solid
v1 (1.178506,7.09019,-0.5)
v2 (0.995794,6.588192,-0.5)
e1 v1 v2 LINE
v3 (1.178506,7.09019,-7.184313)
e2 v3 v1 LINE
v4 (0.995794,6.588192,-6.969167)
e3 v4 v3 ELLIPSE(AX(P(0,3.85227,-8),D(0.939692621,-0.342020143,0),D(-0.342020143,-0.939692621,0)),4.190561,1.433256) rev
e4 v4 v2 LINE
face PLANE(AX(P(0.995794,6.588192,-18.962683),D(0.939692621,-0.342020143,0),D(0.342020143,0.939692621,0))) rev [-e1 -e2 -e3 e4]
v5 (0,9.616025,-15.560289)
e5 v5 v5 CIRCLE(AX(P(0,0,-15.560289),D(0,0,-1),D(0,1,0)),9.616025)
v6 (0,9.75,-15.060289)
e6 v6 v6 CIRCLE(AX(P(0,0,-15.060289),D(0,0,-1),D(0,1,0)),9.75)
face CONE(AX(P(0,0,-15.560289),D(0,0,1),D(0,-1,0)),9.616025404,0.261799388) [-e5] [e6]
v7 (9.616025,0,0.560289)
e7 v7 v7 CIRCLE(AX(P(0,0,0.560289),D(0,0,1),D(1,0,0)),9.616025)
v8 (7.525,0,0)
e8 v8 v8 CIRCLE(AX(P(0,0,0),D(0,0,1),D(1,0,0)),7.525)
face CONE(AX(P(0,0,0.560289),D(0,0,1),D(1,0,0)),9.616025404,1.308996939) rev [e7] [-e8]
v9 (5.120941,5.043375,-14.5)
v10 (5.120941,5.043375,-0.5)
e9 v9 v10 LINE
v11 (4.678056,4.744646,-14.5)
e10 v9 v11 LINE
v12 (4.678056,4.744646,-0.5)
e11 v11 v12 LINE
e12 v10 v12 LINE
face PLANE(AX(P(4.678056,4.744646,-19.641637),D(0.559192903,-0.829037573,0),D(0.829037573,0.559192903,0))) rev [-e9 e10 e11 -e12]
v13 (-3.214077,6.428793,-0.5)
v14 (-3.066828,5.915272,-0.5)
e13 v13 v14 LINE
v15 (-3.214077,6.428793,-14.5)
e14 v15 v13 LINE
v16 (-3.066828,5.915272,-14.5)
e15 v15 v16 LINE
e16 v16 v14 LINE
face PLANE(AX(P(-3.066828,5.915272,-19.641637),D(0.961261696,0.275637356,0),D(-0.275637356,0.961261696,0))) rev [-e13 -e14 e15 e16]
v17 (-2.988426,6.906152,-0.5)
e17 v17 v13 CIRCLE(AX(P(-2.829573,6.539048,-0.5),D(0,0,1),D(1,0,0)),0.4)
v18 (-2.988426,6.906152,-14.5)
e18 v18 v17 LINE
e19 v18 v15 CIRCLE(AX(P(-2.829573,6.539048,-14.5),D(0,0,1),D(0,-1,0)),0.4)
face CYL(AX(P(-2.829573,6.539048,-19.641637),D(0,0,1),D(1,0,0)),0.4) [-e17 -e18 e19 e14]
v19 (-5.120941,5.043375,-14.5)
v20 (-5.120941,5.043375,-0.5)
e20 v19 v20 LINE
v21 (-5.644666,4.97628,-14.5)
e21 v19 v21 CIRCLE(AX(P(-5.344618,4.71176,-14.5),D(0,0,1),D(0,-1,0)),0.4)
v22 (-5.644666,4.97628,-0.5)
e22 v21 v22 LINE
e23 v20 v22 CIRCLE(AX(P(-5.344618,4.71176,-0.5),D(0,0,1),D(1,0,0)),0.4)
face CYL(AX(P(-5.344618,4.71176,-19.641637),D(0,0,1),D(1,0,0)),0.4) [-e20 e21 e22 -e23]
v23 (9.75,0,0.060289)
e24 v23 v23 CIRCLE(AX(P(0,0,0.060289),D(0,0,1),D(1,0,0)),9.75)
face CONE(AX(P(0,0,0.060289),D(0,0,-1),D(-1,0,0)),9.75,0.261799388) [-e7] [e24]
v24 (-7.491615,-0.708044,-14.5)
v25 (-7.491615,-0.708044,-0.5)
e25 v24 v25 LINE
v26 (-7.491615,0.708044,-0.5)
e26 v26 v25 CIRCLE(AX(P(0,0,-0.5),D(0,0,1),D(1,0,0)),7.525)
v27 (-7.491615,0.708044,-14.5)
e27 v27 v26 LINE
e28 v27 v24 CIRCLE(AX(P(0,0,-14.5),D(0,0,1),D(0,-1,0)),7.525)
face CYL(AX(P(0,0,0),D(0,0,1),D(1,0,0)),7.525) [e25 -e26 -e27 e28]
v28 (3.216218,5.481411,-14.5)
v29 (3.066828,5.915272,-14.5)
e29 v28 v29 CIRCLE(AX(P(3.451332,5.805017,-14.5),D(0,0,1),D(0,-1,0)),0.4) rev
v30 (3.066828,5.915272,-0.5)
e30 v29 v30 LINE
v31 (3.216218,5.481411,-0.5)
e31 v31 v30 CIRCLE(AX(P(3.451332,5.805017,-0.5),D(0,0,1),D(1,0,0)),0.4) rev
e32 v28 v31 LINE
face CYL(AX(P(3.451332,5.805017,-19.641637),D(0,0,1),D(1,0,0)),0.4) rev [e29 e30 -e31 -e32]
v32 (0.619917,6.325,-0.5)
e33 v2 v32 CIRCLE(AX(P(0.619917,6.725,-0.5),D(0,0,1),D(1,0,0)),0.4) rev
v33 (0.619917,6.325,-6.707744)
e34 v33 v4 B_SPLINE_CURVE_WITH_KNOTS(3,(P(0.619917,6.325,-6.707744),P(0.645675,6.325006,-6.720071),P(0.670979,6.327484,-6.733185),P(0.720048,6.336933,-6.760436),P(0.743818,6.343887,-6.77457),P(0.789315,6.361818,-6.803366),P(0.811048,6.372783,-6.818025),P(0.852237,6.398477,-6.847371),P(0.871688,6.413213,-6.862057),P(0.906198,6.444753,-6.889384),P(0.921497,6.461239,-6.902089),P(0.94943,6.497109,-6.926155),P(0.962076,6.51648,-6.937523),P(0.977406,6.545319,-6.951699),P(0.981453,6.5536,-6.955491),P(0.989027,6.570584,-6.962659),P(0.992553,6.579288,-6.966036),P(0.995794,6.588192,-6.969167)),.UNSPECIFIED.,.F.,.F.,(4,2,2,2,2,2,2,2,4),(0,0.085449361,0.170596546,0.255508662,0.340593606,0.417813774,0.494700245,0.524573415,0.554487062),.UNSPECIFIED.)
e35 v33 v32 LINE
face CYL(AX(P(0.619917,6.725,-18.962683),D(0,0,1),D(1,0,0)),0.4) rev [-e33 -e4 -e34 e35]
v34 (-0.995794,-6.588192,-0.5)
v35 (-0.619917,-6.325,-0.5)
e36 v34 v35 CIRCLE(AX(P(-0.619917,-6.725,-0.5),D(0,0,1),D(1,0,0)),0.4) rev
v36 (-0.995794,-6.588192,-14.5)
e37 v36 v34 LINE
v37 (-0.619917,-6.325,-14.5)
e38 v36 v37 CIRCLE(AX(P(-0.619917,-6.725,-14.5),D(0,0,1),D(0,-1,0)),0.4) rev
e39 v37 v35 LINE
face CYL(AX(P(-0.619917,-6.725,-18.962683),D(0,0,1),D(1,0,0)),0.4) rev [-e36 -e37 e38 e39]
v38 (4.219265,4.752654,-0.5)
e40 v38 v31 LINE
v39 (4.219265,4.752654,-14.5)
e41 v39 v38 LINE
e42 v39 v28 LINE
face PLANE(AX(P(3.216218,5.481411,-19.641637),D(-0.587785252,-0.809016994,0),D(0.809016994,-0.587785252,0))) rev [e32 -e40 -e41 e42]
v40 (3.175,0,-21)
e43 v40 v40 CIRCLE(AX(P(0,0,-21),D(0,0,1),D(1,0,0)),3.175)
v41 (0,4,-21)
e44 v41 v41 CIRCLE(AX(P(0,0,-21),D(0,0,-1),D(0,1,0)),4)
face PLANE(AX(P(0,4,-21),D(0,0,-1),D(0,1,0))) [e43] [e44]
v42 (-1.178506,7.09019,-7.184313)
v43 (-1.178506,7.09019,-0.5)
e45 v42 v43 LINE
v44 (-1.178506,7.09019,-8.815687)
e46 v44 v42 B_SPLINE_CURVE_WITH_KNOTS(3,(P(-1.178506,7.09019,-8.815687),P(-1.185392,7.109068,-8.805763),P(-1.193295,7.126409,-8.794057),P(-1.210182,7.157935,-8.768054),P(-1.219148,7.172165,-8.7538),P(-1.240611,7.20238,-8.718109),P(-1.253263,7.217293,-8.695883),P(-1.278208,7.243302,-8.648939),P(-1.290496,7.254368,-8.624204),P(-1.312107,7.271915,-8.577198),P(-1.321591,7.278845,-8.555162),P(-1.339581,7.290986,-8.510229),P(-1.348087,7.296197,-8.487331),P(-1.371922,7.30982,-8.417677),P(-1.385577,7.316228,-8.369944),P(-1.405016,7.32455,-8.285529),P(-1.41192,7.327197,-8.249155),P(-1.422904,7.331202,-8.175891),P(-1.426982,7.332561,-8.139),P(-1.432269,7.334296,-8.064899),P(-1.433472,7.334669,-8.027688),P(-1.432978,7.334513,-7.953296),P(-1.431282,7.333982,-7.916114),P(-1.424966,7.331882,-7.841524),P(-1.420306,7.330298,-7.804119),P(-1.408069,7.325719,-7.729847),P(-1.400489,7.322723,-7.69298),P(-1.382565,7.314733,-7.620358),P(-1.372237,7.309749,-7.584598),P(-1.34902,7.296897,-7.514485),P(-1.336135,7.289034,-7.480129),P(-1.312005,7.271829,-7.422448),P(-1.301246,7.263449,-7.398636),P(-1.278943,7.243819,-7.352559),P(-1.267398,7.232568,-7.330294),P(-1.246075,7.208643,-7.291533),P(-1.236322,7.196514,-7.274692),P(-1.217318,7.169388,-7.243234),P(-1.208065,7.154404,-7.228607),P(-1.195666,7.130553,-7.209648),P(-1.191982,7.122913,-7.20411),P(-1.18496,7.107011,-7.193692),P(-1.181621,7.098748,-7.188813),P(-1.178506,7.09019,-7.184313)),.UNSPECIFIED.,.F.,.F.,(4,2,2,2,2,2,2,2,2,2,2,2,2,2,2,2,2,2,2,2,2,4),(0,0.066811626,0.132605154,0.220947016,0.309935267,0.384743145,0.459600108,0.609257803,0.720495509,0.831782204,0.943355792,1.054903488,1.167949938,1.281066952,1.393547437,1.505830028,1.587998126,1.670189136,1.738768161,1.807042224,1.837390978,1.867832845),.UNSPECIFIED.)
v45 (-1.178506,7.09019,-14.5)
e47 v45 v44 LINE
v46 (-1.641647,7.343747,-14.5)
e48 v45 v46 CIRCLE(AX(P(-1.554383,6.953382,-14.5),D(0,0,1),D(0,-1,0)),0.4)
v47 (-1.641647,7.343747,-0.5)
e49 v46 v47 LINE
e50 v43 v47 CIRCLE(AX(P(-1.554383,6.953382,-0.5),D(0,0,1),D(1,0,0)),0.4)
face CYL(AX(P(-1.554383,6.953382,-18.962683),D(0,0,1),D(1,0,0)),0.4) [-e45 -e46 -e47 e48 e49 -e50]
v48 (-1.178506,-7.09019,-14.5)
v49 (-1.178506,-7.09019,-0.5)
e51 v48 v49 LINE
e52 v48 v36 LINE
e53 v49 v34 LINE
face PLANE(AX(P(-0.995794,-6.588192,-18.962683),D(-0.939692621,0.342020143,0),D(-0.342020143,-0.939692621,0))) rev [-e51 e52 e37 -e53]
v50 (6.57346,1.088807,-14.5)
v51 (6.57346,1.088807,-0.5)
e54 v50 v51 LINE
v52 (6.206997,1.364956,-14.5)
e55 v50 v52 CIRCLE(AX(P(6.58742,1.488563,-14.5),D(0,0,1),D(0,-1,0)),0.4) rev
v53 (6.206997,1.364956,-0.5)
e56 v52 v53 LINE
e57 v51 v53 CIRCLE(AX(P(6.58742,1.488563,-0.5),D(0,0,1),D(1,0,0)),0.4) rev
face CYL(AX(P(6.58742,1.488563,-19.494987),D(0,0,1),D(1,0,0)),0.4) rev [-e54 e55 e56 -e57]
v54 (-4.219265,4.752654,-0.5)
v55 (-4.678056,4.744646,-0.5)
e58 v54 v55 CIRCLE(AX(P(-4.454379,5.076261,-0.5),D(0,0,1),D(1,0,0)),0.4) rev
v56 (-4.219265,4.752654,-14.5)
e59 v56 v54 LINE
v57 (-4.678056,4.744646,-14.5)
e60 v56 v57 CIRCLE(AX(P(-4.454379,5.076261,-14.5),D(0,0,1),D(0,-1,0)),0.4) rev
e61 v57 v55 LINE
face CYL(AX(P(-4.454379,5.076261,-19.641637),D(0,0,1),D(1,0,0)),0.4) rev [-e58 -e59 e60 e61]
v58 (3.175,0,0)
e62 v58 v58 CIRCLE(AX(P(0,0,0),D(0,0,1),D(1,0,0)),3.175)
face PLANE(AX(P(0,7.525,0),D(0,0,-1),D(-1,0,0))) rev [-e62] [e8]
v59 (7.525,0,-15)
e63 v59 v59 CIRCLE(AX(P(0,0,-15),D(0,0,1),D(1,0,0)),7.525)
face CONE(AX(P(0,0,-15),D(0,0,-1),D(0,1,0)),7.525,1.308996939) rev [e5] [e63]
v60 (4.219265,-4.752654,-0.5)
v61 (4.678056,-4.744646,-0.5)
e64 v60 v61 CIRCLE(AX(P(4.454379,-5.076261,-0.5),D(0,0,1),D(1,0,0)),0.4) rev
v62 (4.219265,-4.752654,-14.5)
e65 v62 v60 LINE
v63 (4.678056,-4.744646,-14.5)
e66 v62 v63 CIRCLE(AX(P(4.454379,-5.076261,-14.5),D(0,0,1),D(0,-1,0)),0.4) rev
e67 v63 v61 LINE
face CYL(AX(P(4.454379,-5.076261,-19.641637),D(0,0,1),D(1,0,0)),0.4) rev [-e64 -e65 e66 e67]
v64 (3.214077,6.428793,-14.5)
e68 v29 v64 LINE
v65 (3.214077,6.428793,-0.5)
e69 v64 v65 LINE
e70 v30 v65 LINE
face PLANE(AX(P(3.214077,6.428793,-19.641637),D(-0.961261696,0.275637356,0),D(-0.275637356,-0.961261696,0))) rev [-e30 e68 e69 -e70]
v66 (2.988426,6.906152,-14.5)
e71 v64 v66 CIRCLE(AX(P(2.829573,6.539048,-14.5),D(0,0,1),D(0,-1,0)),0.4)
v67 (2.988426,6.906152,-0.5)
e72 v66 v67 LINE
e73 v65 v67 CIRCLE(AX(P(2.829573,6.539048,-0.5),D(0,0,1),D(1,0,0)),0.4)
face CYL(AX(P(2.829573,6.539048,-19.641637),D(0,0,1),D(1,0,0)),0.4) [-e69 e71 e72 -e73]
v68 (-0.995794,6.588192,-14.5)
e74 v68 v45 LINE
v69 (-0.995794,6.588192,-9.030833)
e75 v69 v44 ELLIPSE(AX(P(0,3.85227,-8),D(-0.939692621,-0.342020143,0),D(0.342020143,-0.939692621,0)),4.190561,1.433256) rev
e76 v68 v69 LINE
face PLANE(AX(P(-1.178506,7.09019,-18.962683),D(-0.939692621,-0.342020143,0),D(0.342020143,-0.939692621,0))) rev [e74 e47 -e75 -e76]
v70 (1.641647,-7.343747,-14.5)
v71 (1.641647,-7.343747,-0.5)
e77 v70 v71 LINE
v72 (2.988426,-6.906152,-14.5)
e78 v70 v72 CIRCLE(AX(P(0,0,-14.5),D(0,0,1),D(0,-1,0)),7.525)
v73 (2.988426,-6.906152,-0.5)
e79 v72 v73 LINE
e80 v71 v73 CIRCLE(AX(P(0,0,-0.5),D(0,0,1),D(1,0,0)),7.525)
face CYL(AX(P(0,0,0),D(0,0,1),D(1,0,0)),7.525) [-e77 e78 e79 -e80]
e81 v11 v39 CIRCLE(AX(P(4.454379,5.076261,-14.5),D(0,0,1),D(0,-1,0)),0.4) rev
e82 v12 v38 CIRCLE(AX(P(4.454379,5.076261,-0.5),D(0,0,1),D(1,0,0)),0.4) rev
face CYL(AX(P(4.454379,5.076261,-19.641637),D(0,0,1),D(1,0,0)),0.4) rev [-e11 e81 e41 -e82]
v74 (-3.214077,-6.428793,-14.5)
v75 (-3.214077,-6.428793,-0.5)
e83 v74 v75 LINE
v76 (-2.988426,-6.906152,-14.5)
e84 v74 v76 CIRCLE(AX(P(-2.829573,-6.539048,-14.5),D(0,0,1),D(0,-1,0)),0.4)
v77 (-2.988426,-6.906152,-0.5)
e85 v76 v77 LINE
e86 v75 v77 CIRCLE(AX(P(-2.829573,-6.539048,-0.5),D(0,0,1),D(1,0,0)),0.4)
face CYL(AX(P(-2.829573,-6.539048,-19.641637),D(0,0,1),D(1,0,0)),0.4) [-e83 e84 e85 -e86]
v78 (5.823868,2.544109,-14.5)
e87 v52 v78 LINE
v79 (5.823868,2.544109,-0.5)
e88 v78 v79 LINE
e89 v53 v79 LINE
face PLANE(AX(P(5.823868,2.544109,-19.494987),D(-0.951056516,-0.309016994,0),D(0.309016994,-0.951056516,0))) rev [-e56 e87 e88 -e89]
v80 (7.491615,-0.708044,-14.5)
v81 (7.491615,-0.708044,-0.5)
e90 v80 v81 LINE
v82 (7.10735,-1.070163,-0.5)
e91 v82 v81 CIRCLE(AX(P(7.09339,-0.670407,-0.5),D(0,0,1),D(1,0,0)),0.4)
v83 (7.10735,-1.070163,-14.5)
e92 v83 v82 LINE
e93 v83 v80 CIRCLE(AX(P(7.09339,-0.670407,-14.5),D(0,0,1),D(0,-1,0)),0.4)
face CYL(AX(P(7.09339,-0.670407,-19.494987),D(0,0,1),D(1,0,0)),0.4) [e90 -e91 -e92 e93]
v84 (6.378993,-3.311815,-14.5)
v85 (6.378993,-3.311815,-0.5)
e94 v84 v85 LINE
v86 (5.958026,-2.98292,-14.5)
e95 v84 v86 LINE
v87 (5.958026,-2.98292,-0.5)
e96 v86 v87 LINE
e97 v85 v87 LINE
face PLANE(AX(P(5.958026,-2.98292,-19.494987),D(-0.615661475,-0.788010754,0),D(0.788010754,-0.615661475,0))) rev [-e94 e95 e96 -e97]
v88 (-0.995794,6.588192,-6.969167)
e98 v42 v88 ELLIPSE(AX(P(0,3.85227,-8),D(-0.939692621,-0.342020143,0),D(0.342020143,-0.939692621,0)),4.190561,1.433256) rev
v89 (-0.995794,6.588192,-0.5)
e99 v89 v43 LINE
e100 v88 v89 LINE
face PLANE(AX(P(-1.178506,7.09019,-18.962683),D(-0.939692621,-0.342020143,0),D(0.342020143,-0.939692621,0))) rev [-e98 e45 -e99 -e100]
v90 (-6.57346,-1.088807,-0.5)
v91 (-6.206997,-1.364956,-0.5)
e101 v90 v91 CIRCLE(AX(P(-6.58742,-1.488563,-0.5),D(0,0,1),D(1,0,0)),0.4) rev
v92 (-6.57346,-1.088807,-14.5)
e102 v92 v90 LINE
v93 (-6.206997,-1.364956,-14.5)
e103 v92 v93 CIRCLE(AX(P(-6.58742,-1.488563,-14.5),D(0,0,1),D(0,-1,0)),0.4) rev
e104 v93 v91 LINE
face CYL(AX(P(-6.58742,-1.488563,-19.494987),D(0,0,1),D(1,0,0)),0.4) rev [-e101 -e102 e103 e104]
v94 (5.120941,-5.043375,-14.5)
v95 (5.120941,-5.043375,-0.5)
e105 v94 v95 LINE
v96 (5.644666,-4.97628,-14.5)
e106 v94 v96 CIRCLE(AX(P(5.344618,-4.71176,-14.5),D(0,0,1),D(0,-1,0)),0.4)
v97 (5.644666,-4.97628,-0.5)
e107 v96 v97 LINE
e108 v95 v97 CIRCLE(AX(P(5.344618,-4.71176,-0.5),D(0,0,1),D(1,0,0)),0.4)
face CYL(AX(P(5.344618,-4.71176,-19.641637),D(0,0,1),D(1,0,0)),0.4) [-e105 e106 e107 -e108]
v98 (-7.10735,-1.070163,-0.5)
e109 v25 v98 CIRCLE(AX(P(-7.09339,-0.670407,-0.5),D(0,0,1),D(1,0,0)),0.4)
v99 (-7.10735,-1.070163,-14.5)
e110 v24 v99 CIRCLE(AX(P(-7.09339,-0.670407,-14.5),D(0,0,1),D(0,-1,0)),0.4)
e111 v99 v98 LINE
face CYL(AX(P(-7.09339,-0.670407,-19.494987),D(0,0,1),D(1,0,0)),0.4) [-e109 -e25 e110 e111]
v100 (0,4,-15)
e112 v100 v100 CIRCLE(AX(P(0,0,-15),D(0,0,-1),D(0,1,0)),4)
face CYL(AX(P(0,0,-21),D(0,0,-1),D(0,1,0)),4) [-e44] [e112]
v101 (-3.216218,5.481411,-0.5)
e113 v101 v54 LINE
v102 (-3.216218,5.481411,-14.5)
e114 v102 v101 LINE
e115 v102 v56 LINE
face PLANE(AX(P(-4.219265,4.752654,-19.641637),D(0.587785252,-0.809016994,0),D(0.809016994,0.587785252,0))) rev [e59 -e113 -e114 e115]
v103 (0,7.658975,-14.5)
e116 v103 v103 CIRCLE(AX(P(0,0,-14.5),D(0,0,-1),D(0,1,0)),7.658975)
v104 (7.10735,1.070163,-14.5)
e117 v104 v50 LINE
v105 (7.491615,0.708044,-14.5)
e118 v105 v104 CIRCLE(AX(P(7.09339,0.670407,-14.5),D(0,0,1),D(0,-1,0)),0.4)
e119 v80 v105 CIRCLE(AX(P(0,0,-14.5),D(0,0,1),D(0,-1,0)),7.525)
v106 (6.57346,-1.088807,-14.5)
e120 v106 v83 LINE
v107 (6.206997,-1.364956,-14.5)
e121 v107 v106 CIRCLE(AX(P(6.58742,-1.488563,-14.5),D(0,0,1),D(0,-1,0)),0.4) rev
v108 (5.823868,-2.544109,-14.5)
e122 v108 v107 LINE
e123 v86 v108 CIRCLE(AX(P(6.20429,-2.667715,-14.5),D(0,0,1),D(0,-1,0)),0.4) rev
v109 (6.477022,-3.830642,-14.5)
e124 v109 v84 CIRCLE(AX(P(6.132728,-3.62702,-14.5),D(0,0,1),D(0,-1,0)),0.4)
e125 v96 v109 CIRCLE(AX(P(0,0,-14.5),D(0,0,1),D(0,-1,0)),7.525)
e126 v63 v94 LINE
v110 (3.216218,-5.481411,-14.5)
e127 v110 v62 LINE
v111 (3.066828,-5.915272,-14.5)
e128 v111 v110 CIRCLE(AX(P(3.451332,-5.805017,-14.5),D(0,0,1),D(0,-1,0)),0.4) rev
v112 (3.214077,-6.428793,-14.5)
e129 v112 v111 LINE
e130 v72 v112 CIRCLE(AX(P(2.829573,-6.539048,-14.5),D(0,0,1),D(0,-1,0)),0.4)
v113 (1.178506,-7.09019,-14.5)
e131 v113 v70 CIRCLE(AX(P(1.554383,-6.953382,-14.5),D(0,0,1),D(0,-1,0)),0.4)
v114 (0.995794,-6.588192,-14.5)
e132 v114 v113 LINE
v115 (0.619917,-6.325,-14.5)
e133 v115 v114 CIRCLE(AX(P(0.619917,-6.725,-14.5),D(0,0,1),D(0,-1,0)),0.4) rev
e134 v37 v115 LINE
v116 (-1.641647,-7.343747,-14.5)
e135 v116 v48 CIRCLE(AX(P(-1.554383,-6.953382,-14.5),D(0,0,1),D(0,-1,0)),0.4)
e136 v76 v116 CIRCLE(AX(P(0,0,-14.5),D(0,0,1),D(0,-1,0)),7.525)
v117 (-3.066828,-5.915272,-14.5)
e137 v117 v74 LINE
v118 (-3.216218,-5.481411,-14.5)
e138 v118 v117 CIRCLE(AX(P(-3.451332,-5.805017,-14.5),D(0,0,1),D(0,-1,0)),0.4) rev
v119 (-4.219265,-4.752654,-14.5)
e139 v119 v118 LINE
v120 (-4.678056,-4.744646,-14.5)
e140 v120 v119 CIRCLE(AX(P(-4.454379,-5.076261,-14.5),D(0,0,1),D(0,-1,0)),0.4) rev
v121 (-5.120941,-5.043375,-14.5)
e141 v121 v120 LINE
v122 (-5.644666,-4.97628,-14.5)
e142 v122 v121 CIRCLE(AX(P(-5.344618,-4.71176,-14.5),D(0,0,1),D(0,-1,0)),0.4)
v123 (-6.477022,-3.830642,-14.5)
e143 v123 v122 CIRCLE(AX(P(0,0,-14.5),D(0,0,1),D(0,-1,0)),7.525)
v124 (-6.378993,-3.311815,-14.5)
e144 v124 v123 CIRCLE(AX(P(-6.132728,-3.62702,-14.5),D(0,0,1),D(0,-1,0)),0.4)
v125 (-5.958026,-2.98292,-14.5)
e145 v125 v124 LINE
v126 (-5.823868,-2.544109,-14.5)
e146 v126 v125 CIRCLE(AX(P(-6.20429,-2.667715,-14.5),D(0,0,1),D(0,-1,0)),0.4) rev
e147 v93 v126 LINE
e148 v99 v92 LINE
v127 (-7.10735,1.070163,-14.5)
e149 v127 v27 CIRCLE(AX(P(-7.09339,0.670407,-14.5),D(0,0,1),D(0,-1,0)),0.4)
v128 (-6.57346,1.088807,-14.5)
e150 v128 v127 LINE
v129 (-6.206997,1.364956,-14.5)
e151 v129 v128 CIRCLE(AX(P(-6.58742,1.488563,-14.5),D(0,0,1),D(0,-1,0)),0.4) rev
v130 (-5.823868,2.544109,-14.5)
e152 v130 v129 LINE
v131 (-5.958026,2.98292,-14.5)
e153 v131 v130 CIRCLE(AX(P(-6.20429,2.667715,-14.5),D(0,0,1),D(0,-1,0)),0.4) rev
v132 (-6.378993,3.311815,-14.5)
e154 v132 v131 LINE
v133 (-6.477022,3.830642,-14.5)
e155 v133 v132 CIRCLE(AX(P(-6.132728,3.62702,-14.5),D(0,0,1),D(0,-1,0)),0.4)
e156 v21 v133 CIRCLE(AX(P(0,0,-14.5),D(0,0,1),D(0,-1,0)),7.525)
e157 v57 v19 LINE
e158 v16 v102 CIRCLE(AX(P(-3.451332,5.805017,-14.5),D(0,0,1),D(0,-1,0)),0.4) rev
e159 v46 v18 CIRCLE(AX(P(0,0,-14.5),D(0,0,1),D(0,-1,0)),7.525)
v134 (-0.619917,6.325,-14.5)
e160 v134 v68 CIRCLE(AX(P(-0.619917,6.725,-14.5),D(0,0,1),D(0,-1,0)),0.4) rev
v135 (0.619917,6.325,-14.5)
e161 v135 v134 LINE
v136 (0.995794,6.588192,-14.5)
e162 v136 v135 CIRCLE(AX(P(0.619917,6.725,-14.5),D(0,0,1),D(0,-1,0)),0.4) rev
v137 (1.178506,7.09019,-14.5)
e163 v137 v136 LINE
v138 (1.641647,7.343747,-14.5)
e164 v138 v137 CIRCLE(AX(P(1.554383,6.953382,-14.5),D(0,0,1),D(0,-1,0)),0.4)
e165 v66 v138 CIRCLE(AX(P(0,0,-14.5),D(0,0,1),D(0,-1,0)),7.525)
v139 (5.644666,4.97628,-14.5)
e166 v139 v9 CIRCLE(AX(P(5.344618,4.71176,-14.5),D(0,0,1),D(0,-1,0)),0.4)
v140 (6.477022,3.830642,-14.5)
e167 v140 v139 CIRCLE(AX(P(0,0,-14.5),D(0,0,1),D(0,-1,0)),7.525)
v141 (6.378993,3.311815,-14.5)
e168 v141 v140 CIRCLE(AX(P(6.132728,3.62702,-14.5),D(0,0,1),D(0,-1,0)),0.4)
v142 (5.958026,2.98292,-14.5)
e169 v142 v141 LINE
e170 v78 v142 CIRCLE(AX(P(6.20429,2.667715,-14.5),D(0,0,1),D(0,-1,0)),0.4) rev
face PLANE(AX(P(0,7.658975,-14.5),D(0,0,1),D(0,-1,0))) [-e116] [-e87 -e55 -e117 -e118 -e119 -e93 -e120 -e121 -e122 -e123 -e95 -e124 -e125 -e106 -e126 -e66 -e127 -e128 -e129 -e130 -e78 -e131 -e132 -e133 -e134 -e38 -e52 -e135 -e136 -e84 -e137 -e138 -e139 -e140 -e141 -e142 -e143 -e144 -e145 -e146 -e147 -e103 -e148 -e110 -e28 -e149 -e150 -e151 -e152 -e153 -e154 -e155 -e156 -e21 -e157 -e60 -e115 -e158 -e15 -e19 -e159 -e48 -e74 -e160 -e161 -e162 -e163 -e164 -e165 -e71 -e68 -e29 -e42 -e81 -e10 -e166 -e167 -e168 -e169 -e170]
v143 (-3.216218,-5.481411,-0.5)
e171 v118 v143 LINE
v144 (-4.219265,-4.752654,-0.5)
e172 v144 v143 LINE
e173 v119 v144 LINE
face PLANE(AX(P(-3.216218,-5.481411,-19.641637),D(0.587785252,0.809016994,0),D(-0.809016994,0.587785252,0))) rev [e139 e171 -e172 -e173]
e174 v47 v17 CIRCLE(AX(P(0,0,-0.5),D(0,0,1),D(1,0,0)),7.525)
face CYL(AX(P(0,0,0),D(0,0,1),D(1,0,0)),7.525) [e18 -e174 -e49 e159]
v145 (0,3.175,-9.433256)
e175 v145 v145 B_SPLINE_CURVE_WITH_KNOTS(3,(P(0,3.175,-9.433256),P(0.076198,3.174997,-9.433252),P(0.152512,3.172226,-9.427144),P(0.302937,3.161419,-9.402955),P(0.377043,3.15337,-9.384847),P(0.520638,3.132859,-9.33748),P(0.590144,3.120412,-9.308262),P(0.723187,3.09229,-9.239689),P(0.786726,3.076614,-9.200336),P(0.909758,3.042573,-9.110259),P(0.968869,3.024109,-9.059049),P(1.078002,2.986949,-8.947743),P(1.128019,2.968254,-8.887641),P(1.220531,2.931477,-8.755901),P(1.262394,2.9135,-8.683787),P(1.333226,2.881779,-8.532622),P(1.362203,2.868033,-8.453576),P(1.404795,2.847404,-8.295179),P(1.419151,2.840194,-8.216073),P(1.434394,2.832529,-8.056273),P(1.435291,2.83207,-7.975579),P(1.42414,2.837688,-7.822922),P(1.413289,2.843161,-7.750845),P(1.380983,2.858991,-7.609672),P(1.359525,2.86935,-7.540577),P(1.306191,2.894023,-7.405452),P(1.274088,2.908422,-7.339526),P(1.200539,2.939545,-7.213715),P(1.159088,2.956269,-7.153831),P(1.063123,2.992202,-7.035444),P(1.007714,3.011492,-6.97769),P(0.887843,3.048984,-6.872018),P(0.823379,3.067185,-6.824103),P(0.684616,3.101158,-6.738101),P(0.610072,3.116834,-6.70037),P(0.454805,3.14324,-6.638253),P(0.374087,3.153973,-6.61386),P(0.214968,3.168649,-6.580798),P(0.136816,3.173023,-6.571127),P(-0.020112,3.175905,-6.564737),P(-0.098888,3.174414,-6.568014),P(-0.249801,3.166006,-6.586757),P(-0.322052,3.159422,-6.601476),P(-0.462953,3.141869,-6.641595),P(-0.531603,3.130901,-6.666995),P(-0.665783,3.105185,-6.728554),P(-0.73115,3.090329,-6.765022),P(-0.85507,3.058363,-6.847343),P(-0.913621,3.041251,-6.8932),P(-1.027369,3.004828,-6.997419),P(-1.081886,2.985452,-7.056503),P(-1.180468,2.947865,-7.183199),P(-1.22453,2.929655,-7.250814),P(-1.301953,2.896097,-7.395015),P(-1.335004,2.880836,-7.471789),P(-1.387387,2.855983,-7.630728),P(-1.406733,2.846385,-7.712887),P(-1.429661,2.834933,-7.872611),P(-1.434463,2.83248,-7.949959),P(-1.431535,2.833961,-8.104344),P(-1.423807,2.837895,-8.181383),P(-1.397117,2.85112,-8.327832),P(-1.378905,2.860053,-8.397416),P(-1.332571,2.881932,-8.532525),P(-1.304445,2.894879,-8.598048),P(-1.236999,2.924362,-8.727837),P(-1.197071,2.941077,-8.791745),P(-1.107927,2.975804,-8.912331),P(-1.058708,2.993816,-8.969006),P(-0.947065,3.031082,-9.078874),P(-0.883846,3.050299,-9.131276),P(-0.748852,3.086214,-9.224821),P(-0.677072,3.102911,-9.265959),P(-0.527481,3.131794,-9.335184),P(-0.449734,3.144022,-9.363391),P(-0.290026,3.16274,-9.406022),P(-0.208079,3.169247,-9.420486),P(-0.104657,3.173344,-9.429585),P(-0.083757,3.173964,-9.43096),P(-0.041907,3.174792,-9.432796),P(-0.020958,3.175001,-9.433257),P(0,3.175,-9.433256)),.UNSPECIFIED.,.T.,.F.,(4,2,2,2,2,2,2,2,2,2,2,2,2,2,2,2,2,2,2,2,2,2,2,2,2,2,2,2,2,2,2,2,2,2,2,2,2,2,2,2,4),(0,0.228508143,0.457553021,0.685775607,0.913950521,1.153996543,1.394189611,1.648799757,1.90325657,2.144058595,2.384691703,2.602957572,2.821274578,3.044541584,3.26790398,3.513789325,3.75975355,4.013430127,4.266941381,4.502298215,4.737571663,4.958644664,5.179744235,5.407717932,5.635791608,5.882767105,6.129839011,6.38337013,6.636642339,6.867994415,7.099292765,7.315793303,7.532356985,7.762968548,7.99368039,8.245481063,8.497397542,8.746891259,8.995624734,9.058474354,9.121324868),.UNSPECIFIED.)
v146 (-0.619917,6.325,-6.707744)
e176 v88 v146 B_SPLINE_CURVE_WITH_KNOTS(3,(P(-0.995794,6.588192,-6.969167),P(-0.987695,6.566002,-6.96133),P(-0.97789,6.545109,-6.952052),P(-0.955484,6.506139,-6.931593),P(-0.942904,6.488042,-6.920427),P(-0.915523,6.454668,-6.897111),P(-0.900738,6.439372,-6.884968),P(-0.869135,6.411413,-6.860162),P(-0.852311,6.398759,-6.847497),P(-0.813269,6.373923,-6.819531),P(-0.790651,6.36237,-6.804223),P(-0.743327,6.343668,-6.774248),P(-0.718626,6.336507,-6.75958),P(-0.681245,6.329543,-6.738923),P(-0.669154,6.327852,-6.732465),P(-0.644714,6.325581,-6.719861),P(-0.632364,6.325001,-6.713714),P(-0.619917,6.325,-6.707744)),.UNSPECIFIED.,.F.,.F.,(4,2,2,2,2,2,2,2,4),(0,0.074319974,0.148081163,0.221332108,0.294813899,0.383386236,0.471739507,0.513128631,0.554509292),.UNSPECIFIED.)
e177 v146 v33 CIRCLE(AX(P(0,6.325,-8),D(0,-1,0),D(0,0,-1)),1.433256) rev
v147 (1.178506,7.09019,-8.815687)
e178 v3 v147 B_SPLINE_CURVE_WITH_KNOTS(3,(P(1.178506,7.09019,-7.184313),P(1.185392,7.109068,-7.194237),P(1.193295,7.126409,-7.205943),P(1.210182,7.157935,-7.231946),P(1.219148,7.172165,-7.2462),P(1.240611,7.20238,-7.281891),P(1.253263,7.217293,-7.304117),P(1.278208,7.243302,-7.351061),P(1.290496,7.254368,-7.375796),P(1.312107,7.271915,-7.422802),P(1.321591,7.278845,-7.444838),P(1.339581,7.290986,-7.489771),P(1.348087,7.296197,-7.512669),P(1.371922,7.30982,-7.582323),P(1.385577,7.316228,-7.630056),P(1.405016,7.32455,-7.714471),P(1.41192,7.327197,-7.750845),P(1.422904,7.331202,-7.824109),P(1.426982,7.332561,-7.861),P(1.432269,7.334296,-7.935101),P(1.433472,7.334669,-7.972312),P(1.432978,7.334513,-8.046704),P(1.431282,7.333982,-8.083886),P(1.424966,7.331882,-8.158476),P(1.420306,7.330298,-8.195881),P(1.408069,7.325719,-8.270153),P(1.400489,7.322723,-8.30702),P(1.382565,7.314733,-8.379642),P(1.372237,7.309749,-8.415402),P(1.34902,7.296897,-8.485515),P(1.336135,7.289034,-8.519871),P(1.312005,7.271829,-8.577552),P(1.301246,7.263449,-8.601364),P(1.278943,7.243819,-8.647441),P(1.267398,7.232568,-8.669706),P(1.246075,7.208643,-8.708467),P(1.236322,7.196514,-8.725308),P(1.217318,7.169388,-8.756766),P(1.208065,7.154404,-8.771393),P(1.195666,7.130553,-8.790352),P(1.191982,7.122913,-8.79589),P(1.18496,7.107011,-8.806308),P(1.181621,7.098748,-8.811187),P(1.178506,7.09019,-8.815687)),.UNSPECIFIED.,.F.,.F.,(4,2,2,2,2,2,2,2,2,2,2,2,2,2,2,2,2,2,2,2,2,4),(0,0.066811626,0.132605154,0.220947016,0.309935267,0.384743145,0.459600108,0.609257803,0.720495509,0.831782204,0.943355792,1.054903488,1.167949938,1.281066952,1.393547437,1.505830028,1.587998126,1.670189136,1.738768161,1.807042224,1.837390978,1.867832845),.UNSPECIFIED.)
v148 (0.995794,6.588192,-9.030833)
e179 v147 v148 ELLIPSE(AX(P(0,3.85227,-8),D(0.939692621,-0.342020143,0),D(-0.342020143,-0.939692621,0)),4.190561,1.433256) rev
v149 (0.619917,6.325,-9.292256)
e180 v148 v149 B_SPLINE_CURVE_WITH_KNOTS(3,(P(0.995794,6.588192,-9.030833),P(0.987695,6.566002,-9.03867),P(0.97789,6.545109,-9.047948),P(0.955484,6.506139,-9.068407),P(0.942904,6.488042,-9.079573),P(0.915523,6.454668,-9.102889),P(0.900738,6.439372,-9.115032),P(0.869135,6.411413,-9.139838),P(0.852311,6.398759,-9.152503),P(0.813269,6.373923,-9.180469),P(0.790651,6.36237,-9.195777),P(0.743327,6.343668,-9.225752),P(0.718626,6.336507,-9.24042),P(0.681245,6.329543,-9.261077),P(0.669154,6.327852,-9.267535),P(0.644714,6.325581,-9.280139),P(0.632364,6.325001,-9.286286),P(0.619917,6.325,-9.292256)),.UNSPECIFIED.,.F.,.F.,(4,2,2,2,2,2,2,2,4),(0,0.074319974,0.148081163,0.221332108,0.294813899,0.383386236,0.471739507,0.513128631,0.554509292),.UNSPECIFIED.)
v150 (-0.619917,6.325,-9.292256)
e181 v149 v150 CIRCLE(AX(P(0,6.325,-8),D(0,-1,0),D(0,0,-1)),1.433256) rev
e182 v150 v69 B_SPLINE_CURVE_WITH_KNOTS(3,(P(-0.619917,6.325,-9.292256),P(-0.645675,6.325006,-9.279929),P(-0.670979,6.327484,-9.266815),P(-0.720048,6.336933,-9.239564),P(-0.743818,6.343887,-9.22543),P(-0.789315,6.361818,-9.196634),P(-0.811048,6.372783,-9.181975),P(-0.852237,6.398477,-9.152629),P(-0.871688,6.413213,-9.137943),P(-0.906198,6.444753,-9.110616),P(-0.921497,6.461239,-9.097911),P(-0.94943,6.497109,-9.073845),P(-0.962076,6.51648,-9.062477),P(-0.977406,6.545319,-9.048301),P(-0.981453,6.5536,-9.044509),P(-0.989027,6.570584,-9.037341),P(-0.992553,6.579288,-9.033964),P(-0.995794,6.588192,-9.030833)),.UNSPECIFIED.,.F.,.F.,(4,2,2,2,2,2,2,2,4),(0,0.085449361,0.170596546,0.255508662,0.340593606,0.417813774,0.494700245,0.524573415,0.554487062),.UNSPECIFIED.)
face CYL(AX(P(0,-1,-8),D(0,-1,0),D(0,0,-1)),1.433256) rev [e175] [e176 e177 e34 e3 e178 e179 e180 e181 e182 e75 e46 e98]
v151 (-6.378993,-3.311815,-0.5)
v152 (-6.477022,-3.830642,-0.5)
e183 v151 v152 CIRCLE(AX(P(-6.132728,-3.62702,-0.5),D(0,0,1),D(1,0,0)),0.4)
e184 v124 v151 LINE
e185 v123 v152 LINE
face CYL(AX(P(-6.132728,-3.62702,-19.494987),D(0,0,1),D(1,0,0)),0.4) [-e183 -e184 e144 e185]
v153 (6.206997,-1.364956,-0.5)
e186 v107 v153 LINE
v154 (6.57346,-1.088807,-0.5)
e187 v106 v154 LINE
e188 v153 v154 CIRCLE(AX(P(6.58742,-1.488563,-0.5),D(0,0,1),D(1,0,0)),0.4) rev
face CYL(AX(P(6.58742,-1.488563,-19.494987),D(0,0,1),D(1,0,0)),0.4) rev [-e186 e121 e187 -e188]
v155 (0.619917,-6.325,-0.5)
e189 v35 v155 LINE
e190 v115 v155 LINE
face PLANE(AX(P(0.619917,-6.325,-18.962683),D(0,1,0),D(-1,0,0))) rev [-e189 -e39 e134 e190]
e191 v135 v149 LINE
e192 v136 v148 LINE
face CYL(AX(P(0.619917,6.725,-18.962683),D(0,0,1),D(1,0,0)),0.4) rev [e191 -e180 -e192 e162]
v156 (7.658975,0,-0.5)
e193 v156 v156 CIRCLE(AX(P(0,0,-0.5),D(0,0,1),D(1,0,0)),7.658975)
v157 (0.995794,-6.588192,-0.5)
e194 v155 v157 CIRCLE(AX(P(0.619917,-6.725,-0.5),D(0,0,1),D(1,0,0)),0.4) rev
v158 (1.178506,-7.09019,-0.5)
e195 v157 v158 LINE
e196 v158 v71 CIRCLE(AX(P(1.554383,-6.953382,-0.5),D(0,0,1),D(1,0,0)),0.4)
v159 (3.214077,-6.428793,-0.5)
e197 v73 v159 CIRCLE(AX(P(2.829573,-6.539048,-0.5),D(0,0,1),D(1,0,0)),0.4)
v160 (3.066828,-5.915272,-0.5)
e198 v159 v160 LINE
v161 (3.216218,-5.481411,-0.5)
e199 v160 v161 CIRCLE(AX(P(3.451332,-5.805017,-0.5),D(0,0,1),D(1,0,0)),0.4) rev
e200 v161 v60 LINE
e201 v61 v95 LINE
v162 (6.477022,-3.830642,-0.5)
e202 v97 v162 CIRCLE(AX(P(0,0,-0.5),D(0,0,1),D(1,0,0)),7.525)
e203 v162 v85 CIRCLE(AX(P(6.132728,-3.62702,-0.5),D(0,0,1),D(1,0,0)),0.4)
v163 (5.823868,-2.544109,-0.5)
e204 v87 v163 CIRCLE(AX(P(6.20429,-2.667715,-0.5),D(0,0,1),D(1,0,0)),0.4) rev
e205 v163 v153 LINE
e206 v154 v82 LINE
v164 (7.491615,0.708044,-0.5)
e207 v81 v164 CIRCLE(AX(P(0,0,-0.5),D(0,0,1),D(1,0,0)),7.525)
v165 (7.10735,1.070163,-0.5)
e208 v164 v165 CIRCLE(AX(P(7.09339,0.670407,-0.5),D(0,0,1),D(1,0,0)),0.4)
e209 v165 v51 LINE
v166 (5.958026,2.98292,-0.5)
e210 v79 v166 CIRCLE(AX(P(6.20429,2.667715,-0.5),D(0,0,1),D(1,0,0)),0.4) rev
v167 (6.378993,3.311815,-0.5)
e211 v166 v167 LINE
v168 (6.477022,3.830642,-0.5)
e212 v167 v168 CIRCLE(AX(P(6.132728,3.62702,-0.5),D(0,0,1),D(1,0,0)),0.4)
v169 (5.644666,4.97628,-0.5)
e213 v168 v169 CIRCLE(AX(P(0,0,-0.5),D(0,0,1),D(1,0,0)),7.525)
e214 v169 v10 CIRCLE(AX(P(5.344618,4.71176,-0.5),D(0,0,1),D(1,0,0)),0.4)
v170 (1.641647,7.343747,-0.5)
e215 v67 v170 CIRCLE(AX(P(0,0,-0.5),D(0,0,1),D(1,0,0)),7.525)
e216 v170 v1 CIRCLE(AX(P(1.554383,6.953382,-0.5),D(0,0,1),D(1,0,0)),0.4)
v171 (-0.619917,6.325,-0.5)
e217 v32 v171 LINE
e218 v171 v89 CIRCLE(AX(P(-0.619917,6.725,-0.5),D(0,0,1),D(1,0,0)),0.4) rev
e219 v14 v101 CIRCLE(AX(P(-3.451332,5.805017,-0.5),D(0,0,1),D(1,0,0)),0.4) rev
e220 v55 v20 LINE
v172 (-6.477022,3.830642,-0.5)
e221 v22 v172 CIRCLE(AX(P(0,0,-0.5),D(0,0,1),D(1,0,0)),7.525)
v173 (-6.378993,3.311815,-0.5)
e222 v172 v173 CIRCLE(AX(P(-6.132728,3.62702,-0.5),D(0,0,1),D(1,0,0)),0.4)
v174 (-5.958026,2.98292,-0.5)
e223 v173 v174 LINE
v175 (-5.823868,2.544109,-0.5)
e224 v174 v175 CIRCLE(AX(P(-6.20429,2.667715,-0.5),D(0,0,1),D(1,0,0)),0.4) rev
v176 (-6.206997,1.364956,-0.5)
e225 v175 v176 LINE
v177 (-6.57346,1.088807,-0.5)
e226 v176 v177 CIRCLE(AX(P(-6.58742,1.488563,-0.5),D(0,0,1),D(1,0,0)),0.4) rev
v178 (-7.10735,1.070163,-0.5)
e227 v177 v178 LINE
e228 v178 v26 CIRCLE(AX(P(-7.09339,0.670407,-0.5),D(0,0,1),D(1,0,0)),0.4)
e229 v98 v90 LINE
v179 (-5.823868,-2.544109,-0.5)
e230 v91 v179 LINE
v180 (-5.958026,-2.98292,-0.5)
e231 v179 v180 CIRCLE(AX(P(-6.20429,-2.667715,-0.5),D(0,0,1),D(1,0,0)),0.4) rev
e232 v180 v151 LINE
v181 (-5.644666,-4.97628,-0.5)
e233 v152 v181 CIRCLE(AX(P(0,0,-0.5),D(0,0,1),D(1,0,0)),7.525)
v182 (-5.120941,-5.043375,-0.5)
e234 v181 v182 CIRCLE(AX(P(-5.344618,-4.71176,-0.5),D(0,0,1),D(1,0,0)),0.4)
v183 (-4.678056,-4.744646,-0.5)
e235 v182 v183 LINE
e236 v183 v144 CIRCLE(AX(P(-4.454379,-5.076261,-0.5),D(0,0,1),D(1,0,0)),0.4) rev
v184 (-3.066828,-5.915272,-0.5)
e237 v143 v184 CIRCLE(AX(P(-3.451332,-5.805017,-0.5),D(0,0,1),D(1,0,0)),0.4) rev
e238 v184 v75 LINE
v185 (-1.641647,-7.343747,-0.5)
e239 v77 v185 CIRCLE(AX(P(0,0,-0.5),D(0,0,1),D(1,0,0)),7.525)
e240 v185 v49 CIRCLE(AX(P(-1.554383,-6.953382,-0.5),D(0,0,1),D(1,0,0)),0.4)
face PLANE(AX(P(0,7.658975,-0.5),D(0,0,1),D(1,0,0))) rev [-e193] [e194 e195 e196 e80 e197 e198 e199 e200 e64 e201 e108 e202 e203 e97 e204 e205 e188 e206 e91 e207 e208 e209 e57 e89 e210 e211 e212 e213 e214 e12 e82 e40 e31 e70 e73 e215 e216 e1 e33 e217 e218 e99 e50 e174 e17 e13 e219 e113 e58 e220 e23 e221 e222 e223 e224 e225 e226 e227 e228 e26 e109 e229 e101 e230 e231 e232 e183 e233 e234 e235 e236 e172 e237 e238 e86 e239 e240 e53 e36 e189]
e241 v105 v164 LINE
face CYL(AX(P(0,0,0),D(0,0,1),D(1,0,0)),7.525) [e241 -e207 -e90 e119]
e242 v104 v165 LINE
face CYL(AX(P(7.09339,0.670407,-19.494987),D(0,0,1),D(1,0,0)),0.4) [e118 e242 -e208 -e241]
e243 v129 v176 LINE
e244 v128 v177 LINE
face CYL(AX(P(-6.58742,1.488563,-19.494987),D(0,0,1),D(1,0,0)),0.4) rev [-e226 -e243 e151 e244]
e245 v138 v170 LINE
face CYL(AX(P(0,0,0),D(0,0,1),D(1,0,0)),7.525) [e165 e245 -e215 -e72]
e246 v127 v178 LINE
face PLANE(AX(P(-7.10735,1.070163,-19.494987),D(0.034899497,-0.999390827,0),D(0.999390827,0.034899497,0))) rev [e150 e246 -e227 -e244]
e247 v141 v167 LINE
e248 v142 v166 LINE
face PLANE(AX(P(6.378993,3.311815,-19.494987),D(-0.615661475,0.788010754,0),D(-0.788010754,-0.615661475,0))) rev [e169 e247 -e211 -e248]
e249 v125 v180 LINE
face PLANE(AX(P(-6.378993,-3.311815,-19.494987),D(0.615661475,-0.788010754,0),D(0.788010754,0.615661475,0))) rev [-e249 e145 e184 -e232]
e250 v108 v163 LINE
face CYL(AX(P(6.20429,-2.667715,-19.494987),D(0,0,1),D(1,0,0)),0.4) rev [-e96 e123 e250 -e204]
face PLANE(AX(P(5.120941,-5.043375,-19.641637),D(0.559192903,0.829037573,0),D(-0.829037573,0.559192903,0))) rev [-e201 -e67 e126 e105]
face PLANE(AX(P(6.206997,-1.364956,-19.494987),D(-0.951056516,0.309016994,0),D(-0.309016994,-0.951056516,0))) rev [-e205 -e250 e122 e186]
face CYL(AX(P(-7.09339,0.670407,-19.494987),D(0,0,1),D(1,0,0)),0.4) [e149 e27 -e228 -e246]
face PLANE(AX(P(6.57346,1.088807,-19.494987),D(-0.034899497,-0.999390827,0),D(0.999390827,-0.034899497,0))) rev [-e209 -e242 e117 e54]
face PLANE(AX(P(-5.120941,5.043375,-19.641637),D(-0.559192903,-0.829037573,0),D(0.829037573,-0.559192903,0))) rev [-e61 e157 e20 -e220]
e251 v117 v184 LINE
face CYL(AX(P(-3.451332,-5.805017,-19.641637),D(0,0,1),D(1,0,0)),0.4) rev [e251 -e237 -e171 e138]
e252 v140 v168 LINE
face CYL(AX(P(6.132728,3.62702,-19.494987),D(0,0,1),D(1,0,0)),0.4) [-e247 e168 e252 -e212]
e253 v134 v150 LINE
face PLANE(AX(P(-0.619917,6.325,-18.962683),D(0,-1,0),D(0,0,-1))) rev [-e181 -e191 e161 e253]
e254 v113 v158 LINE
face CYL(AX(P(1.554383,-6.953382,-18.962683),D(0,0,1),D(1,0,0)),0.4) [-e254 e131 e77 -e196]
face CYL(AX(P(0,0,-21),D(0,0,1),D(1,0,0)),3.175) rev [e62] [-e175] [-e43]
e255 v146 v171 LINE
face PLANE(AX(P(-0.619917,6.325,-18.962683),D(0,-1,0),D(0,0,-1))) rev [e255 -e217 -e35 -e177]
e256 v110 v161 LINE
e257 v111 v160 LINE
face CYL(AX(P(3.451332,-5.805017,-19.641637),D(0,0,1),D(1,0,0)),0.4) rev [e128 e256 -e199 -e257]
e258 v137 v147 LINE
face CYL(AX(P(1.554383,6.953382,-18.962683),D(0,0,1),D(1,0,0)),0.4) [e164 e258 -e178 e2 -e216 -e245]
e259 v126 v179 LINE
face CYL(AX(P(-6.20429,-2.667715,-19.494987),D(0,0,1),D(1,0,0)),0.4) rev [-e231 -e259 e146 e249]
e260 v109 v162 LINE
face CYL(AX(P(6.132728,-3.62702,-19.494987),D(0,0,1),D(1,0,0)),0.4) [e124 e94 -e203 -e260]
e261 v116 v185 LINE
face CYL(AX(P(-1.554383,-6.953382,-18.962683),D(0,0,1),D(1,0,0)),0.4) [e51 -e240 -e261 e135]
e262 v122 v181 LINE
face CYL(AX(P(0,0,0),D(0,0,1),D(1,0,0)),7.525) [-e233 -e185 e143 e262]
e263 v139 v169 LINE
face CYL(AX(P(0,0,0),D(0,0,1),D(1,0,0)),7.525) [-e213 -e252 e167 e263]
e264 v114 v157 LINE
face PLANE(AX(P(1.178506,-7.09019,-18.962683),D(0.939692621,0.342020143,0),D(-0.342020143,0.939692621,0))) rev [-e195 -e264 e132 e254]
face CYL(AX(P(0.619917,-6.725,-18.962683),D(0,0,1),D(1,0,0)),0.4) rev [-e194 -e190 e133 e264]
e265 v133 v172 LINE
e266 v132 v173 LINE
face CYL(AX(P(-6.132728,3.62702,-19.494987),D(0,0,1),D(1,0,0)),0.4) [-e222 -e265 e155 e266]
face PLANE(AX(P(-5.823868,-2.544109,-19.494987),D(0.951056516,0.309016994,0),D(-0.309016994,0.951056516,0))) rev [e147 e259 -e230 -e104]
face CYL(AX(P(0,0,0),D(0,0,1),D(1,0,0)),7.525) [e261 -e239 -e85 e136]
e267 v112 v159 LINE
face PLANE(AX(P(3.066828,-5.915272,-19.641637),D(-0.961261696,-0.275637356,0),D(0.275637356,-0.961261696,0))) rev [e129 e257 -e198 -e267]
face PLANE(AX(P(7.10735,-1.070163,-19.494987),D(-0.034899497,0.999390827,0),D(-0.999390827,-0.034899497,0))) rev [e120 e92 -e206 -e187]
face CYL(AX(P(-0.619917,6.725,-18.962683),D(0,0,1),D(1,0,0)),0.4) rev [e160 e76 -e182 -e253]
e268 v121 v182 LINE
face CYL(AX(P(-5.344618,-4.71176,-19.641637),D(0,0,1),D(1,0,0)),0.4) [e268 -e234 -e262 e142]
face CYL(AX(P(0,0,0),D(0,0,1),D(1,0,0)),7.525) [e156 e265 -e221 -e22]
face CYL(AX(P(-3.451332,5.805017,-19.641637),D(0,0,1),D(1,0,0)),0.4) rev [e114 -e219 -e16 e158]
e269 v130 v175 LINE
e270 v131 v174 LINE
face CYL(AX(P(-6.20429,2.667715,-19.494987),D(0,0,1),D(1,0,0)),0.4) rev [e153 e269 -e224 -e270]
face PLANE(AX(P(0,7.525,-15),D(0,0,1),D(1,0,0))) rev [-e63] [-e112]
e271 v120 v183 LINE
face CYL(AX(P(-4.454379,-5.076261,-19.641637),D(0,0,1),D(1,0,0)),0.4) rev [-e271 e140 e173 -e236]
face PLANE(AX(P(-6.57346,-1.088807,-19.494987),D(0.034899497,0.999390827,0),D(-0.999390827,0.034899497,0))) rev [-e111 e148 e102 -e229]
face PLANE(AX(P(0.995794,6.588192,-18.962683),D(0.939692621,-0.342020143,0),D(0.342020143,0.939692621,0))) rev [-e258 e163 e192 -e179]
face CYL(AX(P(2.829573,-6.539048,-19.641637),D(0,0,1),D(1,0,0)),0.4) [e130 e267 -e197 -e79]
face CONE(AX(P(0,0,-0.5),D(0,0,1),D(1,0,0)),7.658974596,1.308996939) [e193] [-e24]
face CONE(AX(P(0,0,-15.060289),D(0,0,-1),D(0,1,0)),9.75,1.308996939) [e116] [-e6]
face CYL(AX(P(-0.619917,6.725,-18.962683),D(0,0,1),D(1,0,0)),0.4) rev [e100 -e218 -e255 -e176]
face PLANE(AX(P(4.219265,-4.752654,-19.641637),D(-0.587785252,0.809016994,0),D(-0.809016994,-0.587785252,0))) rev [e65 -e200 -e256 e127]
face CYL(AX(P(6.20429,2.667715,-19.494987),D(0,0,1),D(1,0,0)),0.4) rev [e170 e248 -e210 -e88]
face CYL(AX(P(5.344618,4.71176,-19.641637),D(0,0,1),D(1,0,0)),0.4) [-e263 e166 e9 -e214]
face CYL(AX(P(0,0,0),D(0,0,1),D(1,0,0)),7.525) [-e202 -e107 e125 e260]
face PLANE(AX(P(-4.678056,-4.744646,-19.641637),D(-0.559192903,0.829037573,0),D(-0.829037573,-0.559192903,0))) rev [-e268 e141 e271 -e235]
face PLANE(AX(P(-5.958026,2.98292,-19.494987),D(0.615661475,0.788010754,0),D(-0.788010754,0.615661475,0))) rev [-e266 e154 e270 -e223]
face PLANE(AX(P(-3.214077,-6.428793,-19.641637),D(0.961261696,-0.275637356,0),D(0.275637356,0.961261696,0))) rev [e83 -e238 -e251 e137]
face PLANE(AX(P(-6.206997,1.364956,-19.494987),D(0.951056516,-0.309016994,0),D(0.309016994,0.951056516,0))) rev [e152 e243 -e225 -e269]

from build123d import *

# Parameters (mm, degrees)
SKETCH5_W                   = 15
SKETCH5_H                   = 7.525
CUT_EXTRUDE_START           = -15
CUT_EXTRUDE_1_OUTLINE_R     = 3.175
CUT_EXTRUDE_1_DEPTH         = 15
CUT_EXTRUDE_START_2         = -21
CUT_EXTRUDE_1_2_OUTLINE_R   = 4
CUT_EXTRUDE_1_2_OUTLINE_R_2 = 3.175
CUT_EXTRUDE_1_2_DEPTH       = 6
CUT_EXTRUDE_START_3         = -14.5
CUT_EXTRUDE_1_3_DEPTH       = 14
CUT_EXTRUDE_START_4         = 2
CUT_EXTRUDE_1_5_OUTLINE_R   = 1.433256124
CUT_EXTRUDE_1_5_DEPTH       = 5.353381724


with BuildPart() as part:
    # Sketch5 → body (revolve)
    with BuildSketch(Plane(origin=(0, 0, 0), x_dir=(0, 0, -1), z_dir=(1, 0, 0)), mode=Mode.PRIVATE) as body_sk:
        with Locations((7.5, 3.7625)):
            Rectangle(SKETCH5_W, SKETCH5_H)
    revolve(body_sk.sketch.rotate(Axis((0, 0, 0), (0, 0, 1)), 270), axis=Axis((0, 0, 0), (0, 0, 1)))

    # Вырез-Вытянуть1: read off the stored shape, not the designer's step
    # Вырез-Вытянуть1 outline → Вырез-Вытянуть1 (cut)
    with BuildSketch(Plane.XY.offset(CUT_EXTRUDE_START)):
        Circle(CUT_EXTRUDE_1_OUTLINE_R)
    extrude(amount=CUT_EXTRUDE_1_DEPTH, mode=Mode.SUBTRACT)

    # Cut-Extrude 1 2 outline → Cut-Extrude 1 2 (add)
    with BuildSketch(Plane.XY.offset(CUT_EXTRUDE_START_2)):
        Circle(CUT_EXTRUDE_1_2_OUTLINE_R)
        Circle(CUT_EXTRUDE_1_2_OUTLINE_R_2, mode=Mode.SUBTRACT)
    extrude(amount=CUT_EXTRUDE_1_2_DEPTH)

    # Cut-Extrude 1 3 outline → Cut-Extrude 1 3 (cut)
    with BuildSketch(Plane.XY.offset(CUT_EXTRUDE_START_3)):
        with BuildLine():
            ThreePointArc((1.178506304, 7.090189781), (1.362296798, 7.304241747), (1.641646979, 7.343747013))
            ThreePointArc((1.641646979, 7.343747013), (0, 7.525), (-1.641646979, 7.343747013))
            ThreePointArc((-1.641646979, 7.343747013), (-1.362296798, 7.304241747), (-1.178506304, 7.090189781))
            Line((-1.178506304, 7.090189781), (-0.995794033, 6.588191943))
            ThreePointArc((-0.995794033, 6.588191943), (-0.84934756, 6.397339182), (-0.619916985, 6.325))
            Line((-0.619916985, 6.325), (0.619916985, 6.325))
            ThreePointArc((0.619916985, 6.325), (0.84934756, 6.397339182), (0.995794033, 6.588191943))
            Line((0.995794033, 6.588191943), (1.178506304, 7.090189781))
        make_face()
        with BuildLine():
            ThreePointArc((5.644666496, 4.976280253), (4.423084023, 6.087852883), (2.988425886, 6.90615202))
            ThreePointArc((2.988425886, 6.90615202), (3.191204317, 6.709993671), (3.214077361, 6.428792651))
            Line((3.214077361, 6.428792651), (3.066827768, 5.915272291))
            ThreePointArc((3.066827768, 5.915272291), (3.073125016, 5.674790087), (3.216218345, 5.481410551))
            Line((3.216218345, 5.481410551), (4.219265096, 4.752654428))
            ThreePointArc((4.219265096, 4.752654428), (4.447398235, 4.676322148), (4.678056359, 4.744646197))
            Line((4.678056359, 4.744646197), (5.120940617, 5.043375401))
            ThreePointArc((5.120940617, 5.043375401), (5.395446839, 5.108517737), (5.644666496, 4.976280253))
        make_face()
        with BuildLine():
            ThreePointArc((-3.214077361, 6.428792651), (-3.191204317, 6.709993671), (-2.988425886, 6.90615202))
            ThreePointArc((-2.988425886, 6.90615202), (-4.423084023, 6.087852883), (-5.644666496, 4.976280253))
            ThreePointArc((-5.644666496, 4.976280253), (-5.395446839, 5.108517737), (-5.120940617, 5.043375401))
            Line((-5.120940617, 5.043375401), (-4.678056359, 4.744646197))
            ThreePointArc((-4.678056359, 4.744646197), (-4.447398235, 4.676322148), (-4.219265096, 4.752654428))
            Line((-4.219265096, 4.752654428), (-3.216218345, 5.481410551))
            ThreePointArc((-3.216218345, 5.481410551), (-3.073125016, 5.674790087), (-3.066827768, 5.915272291))
            Line((-3.066827768, 5.915272291), (-3.214077361, 6.428792651))
        make_face()
        with BuildLine():
            ThreePointArc((7.491615266, 0.708043573), (7.156700285, 2.325352883), (6.477021636, 3.830641686))
            ThreePointArc((6.477021636, 3.830641686), (6.525773848, 3.552756077), (6.378992717, 3.311815235))
            Line((6.378992717, 3.311815235), (5.958025599, 2.982919676))
            ThreePointArc((5.958025599, 2.982919676), (5.821768286, 2.784664057), (5.823867582, 2.544108577))
            Line((5.823867582, 2.544108577), (6.206997349, 1.364956402))
            ThreePointArc((6.206997349, 1.364956402), (6.346693946, 1.169108995), (6.573460157, 1.088806868))
            Line((6.573460157, 1.088806868), (7.107349669, 1.070163036))
            ThreePointArc((7.107349669, 1.070163036), (7.367719572, 0.961513584), (7.491615266, 0.708043573))
        make_face()
        with BuildLine():
            ThreePointArc((-6.378992717, 3.311815235), (-6.525773848, 3.552756077), (-6.477021636, 3.830641686))
            ThreePointArc((-6.477021636, 3.830641686), (-7.156700285, 2.325352883), (-7.491615266, 0.708043573))
            ThreePointArc((-7.491615266, 0.708043573), (-7.367719572, 0.961513584), (-7.107349669, 1.070163036))
            Line((-7.107349669, 1.070163036), (-6.573460157, 1.088806868))
            ThreePointArc((-6.573460157, 1.088806868), (-6.346693946, 1.169108995), (-6.206997349, 1.364956402))
            Line((-6.206997349, 1.364956402), (-5.823867582, 2.544108577))
            ThreePointArc((-5.823867582, 2.544108577), (-5.821768286, 2.784664057), (-5.958025599, 2.982919676))
            Line((-5.958025599, 2.982919676), (-6.378992717, 3.311815235))
        make_face()
        with BuildLine():
            ThreePointArc((6.477021636, -3.830641686), (7.156700285, -2.325352883), (7.491615266, -0.708043573))
            ThreePointArc((7.491615266, -0.708043573), (7.367719572, -0.961513584), (7.107349669, -1.070163036))
            Line((7.107349669, -1.070163036), (6.573460157, -1.088806868))
            ThreePointArc((6.573460157, -1.088806868), (6.346693946, -1.169108995), (6.206997349, -1.364956402))
            Line((6.206997349, -1.364956402), (5.823867582, -2.544108577))
            ThreePointArc((5.823867582, -2.544108577), (5.821768286, -2.784664057), (5.958025599, -2.982919676))
            Line((5.958025599, -2.982919676), (6.378992717, -3.311815235))
            ThreePointArc((6.378992717, -3.311815235), (6.525773848, -3.552756077), (6.477021636, -3.830641686))
        make_face()
        with BuildLine():
            ThreePointArc((-7.107349669, -1.070163036), (-7.367719572, -0.961513584), (-7.491615266, -0.708043573))
            ThreePointArc((-7.491615266, -0.708043573), (-7.156700285, -2.325352883), (-6.477021636, -3.830641686))
            ThreePointArc((-6.477021636, -3.830641686), (-6.525773848, -3.552756077), (-6.378992717, -3.311815235))
            Line((-6.378992717, -3.311815235), (-5.958025599, -2.982919676))
            ThreePointArc((-5.958025599, -2.982919676), (-5.821768286, -2.784664057), (-5.823867582, -2.544108577))
            Line((-5.823867582, -2.544108577), (-6.206997349, -1.364956402))
            ThreePointArc((-6.206997349, -1.364956402), (-6.346693946, -1.169108995), (-6.573460157, -1.088806868))
            Line((-6.573460157, -1.088806868), (-7.107349669, -1.070163036))
        make_face()
        with BuildLine():
            ThreePointArc((2.988425886, -6.90615202), (4.423084023, -6.087852883), (5.644666496, -4.976280253))
            ThreePointArc((5.644666496, -4.976280253), (5.395446839, -5.108517737), (5.120940617, -5.043375401))
            Line((5.120940617, -5.043375401), (4.678056359, -4.744646197))
            ThreePointArc((4.678056359, -4.744646197), (4.447398235, -4.676322148), (4.219265096, -4.752654428))
            Line((4.219265096, -4.752654428), (3.216218345, -5.481410551))
            ThreePointArc((3.216218345, -5.481410551), (3.073125016, -5.674790087), (3.066827768, -5.915272291))
            Line((3.066827768, -5.915272291), (3.214077361, -6.428792651))
            ThreePointArc((3.214077361, -6.428792651), (3.191204317, -6.709993671), (2.988425886, -6.90615202))
        make_face()
        with BuildLine():
            ThreePointArc((-5.120940617, -5.043375401), (-5.395446839, -5.108517737), (-5.644666496, -4.976280253))
            ThreePointArc((-5.644666496, -4.976280253), (-4.423084023, -6.087852883), (-2.988425886, -6.90615202))
            ThreePointArc((-2.988425886, -6.90615202), (-3.191204317, -6.709993671), (-3.214077361, -6.428792651))
            Line((-3.214077361, -6.428792651), (-3.066827768, -5.915272291))
            ThreePointArc((-3.066827768, -5.915272291), (-3.073125016, -5.674790087), (-3.216218345, -5.481410551))
            Line((-3.216218345, -5.481410551), (-4.219265096, -4.752654428))
            ThreePointArc((-4.219265096, -4.752654428), (-4.447398235, -4.676322148), (-4.678056359, -4.744646197))
            Line((-4.678056359, -4.744646197), (-5.120940617, -5.043375401))
        make_face()
        with BuildLine():
            ThreePointArc((-1.641646979, -7.343747013), (0, -7.525), (1.641646979, -7.343747013))
            ThreePointArc((1.641646979, -7.343747013), (1.362296798, -7.304241747), (1.178506304, -7.090189781))
            Line((1.178506304, -7.090189781), (0.995794033, -6.588191943))
            ThreePointArc((0.995794033, -6.588191943), (0.84934756, -6.397339182), (0.619916985, -6.325))
            Line((0.619916985, -6.325), (-0.619916985, -6.325))
            ThreePointArc((-0.619916985, -6.325), (-0.84934756, -6.397339182), (-0.995794033, -6.588191943))
            Line((-0.995794033, -6.588191943), (-1.178506304, -7.090189781))
            ThreePointArc((-1.178506304, -7.090189781), (-1.362296798, -7.304241747), (-1.641646979, -7.343747013))
        make_face()
    extrude(amount=CUT_EXTRUDE_1_3_DEPTH, mode=Mode.SUBTRACT)

    # Cut-Extrude 1 4 outline → Cut-Extrude 1 4 (revolve)
    with BuildSketch(Plane.XZ):
        Polygon((7.525, 0), (7.525, -0.5), (7.658974596, -0.5), (9.75, 0.060288568), (9.616025404, 0.560288568), align=None)
        Polygon((7.658974596, -14.5), (7.525, -14.5), (7.525, -15), (9.616025404, -15.560288568), (9.75, -15.060288568), align=None)
    revolve(axis=Axis((0, 0, 0), (0, 0, 1)))

    # Cut-Extrude 1 5 outline → Cut-Extrude 1 5 (cut)
    with BuildSketch(Plane(origin=(0, 0, 0), x_dir=(1, 0, 0), z_dir=(0, 1, 0)).offset(CUT_EXTRUDE_START_4)):
        with Locations((0, 8)):
            Circle(CUT_EXTRUDE_1_5_OUTLINE_R)
    extrude(amount=CUT_EXTRUDE_1_5_DEPTH, mode=Mode.SUBTRACT)


solid = part.part
